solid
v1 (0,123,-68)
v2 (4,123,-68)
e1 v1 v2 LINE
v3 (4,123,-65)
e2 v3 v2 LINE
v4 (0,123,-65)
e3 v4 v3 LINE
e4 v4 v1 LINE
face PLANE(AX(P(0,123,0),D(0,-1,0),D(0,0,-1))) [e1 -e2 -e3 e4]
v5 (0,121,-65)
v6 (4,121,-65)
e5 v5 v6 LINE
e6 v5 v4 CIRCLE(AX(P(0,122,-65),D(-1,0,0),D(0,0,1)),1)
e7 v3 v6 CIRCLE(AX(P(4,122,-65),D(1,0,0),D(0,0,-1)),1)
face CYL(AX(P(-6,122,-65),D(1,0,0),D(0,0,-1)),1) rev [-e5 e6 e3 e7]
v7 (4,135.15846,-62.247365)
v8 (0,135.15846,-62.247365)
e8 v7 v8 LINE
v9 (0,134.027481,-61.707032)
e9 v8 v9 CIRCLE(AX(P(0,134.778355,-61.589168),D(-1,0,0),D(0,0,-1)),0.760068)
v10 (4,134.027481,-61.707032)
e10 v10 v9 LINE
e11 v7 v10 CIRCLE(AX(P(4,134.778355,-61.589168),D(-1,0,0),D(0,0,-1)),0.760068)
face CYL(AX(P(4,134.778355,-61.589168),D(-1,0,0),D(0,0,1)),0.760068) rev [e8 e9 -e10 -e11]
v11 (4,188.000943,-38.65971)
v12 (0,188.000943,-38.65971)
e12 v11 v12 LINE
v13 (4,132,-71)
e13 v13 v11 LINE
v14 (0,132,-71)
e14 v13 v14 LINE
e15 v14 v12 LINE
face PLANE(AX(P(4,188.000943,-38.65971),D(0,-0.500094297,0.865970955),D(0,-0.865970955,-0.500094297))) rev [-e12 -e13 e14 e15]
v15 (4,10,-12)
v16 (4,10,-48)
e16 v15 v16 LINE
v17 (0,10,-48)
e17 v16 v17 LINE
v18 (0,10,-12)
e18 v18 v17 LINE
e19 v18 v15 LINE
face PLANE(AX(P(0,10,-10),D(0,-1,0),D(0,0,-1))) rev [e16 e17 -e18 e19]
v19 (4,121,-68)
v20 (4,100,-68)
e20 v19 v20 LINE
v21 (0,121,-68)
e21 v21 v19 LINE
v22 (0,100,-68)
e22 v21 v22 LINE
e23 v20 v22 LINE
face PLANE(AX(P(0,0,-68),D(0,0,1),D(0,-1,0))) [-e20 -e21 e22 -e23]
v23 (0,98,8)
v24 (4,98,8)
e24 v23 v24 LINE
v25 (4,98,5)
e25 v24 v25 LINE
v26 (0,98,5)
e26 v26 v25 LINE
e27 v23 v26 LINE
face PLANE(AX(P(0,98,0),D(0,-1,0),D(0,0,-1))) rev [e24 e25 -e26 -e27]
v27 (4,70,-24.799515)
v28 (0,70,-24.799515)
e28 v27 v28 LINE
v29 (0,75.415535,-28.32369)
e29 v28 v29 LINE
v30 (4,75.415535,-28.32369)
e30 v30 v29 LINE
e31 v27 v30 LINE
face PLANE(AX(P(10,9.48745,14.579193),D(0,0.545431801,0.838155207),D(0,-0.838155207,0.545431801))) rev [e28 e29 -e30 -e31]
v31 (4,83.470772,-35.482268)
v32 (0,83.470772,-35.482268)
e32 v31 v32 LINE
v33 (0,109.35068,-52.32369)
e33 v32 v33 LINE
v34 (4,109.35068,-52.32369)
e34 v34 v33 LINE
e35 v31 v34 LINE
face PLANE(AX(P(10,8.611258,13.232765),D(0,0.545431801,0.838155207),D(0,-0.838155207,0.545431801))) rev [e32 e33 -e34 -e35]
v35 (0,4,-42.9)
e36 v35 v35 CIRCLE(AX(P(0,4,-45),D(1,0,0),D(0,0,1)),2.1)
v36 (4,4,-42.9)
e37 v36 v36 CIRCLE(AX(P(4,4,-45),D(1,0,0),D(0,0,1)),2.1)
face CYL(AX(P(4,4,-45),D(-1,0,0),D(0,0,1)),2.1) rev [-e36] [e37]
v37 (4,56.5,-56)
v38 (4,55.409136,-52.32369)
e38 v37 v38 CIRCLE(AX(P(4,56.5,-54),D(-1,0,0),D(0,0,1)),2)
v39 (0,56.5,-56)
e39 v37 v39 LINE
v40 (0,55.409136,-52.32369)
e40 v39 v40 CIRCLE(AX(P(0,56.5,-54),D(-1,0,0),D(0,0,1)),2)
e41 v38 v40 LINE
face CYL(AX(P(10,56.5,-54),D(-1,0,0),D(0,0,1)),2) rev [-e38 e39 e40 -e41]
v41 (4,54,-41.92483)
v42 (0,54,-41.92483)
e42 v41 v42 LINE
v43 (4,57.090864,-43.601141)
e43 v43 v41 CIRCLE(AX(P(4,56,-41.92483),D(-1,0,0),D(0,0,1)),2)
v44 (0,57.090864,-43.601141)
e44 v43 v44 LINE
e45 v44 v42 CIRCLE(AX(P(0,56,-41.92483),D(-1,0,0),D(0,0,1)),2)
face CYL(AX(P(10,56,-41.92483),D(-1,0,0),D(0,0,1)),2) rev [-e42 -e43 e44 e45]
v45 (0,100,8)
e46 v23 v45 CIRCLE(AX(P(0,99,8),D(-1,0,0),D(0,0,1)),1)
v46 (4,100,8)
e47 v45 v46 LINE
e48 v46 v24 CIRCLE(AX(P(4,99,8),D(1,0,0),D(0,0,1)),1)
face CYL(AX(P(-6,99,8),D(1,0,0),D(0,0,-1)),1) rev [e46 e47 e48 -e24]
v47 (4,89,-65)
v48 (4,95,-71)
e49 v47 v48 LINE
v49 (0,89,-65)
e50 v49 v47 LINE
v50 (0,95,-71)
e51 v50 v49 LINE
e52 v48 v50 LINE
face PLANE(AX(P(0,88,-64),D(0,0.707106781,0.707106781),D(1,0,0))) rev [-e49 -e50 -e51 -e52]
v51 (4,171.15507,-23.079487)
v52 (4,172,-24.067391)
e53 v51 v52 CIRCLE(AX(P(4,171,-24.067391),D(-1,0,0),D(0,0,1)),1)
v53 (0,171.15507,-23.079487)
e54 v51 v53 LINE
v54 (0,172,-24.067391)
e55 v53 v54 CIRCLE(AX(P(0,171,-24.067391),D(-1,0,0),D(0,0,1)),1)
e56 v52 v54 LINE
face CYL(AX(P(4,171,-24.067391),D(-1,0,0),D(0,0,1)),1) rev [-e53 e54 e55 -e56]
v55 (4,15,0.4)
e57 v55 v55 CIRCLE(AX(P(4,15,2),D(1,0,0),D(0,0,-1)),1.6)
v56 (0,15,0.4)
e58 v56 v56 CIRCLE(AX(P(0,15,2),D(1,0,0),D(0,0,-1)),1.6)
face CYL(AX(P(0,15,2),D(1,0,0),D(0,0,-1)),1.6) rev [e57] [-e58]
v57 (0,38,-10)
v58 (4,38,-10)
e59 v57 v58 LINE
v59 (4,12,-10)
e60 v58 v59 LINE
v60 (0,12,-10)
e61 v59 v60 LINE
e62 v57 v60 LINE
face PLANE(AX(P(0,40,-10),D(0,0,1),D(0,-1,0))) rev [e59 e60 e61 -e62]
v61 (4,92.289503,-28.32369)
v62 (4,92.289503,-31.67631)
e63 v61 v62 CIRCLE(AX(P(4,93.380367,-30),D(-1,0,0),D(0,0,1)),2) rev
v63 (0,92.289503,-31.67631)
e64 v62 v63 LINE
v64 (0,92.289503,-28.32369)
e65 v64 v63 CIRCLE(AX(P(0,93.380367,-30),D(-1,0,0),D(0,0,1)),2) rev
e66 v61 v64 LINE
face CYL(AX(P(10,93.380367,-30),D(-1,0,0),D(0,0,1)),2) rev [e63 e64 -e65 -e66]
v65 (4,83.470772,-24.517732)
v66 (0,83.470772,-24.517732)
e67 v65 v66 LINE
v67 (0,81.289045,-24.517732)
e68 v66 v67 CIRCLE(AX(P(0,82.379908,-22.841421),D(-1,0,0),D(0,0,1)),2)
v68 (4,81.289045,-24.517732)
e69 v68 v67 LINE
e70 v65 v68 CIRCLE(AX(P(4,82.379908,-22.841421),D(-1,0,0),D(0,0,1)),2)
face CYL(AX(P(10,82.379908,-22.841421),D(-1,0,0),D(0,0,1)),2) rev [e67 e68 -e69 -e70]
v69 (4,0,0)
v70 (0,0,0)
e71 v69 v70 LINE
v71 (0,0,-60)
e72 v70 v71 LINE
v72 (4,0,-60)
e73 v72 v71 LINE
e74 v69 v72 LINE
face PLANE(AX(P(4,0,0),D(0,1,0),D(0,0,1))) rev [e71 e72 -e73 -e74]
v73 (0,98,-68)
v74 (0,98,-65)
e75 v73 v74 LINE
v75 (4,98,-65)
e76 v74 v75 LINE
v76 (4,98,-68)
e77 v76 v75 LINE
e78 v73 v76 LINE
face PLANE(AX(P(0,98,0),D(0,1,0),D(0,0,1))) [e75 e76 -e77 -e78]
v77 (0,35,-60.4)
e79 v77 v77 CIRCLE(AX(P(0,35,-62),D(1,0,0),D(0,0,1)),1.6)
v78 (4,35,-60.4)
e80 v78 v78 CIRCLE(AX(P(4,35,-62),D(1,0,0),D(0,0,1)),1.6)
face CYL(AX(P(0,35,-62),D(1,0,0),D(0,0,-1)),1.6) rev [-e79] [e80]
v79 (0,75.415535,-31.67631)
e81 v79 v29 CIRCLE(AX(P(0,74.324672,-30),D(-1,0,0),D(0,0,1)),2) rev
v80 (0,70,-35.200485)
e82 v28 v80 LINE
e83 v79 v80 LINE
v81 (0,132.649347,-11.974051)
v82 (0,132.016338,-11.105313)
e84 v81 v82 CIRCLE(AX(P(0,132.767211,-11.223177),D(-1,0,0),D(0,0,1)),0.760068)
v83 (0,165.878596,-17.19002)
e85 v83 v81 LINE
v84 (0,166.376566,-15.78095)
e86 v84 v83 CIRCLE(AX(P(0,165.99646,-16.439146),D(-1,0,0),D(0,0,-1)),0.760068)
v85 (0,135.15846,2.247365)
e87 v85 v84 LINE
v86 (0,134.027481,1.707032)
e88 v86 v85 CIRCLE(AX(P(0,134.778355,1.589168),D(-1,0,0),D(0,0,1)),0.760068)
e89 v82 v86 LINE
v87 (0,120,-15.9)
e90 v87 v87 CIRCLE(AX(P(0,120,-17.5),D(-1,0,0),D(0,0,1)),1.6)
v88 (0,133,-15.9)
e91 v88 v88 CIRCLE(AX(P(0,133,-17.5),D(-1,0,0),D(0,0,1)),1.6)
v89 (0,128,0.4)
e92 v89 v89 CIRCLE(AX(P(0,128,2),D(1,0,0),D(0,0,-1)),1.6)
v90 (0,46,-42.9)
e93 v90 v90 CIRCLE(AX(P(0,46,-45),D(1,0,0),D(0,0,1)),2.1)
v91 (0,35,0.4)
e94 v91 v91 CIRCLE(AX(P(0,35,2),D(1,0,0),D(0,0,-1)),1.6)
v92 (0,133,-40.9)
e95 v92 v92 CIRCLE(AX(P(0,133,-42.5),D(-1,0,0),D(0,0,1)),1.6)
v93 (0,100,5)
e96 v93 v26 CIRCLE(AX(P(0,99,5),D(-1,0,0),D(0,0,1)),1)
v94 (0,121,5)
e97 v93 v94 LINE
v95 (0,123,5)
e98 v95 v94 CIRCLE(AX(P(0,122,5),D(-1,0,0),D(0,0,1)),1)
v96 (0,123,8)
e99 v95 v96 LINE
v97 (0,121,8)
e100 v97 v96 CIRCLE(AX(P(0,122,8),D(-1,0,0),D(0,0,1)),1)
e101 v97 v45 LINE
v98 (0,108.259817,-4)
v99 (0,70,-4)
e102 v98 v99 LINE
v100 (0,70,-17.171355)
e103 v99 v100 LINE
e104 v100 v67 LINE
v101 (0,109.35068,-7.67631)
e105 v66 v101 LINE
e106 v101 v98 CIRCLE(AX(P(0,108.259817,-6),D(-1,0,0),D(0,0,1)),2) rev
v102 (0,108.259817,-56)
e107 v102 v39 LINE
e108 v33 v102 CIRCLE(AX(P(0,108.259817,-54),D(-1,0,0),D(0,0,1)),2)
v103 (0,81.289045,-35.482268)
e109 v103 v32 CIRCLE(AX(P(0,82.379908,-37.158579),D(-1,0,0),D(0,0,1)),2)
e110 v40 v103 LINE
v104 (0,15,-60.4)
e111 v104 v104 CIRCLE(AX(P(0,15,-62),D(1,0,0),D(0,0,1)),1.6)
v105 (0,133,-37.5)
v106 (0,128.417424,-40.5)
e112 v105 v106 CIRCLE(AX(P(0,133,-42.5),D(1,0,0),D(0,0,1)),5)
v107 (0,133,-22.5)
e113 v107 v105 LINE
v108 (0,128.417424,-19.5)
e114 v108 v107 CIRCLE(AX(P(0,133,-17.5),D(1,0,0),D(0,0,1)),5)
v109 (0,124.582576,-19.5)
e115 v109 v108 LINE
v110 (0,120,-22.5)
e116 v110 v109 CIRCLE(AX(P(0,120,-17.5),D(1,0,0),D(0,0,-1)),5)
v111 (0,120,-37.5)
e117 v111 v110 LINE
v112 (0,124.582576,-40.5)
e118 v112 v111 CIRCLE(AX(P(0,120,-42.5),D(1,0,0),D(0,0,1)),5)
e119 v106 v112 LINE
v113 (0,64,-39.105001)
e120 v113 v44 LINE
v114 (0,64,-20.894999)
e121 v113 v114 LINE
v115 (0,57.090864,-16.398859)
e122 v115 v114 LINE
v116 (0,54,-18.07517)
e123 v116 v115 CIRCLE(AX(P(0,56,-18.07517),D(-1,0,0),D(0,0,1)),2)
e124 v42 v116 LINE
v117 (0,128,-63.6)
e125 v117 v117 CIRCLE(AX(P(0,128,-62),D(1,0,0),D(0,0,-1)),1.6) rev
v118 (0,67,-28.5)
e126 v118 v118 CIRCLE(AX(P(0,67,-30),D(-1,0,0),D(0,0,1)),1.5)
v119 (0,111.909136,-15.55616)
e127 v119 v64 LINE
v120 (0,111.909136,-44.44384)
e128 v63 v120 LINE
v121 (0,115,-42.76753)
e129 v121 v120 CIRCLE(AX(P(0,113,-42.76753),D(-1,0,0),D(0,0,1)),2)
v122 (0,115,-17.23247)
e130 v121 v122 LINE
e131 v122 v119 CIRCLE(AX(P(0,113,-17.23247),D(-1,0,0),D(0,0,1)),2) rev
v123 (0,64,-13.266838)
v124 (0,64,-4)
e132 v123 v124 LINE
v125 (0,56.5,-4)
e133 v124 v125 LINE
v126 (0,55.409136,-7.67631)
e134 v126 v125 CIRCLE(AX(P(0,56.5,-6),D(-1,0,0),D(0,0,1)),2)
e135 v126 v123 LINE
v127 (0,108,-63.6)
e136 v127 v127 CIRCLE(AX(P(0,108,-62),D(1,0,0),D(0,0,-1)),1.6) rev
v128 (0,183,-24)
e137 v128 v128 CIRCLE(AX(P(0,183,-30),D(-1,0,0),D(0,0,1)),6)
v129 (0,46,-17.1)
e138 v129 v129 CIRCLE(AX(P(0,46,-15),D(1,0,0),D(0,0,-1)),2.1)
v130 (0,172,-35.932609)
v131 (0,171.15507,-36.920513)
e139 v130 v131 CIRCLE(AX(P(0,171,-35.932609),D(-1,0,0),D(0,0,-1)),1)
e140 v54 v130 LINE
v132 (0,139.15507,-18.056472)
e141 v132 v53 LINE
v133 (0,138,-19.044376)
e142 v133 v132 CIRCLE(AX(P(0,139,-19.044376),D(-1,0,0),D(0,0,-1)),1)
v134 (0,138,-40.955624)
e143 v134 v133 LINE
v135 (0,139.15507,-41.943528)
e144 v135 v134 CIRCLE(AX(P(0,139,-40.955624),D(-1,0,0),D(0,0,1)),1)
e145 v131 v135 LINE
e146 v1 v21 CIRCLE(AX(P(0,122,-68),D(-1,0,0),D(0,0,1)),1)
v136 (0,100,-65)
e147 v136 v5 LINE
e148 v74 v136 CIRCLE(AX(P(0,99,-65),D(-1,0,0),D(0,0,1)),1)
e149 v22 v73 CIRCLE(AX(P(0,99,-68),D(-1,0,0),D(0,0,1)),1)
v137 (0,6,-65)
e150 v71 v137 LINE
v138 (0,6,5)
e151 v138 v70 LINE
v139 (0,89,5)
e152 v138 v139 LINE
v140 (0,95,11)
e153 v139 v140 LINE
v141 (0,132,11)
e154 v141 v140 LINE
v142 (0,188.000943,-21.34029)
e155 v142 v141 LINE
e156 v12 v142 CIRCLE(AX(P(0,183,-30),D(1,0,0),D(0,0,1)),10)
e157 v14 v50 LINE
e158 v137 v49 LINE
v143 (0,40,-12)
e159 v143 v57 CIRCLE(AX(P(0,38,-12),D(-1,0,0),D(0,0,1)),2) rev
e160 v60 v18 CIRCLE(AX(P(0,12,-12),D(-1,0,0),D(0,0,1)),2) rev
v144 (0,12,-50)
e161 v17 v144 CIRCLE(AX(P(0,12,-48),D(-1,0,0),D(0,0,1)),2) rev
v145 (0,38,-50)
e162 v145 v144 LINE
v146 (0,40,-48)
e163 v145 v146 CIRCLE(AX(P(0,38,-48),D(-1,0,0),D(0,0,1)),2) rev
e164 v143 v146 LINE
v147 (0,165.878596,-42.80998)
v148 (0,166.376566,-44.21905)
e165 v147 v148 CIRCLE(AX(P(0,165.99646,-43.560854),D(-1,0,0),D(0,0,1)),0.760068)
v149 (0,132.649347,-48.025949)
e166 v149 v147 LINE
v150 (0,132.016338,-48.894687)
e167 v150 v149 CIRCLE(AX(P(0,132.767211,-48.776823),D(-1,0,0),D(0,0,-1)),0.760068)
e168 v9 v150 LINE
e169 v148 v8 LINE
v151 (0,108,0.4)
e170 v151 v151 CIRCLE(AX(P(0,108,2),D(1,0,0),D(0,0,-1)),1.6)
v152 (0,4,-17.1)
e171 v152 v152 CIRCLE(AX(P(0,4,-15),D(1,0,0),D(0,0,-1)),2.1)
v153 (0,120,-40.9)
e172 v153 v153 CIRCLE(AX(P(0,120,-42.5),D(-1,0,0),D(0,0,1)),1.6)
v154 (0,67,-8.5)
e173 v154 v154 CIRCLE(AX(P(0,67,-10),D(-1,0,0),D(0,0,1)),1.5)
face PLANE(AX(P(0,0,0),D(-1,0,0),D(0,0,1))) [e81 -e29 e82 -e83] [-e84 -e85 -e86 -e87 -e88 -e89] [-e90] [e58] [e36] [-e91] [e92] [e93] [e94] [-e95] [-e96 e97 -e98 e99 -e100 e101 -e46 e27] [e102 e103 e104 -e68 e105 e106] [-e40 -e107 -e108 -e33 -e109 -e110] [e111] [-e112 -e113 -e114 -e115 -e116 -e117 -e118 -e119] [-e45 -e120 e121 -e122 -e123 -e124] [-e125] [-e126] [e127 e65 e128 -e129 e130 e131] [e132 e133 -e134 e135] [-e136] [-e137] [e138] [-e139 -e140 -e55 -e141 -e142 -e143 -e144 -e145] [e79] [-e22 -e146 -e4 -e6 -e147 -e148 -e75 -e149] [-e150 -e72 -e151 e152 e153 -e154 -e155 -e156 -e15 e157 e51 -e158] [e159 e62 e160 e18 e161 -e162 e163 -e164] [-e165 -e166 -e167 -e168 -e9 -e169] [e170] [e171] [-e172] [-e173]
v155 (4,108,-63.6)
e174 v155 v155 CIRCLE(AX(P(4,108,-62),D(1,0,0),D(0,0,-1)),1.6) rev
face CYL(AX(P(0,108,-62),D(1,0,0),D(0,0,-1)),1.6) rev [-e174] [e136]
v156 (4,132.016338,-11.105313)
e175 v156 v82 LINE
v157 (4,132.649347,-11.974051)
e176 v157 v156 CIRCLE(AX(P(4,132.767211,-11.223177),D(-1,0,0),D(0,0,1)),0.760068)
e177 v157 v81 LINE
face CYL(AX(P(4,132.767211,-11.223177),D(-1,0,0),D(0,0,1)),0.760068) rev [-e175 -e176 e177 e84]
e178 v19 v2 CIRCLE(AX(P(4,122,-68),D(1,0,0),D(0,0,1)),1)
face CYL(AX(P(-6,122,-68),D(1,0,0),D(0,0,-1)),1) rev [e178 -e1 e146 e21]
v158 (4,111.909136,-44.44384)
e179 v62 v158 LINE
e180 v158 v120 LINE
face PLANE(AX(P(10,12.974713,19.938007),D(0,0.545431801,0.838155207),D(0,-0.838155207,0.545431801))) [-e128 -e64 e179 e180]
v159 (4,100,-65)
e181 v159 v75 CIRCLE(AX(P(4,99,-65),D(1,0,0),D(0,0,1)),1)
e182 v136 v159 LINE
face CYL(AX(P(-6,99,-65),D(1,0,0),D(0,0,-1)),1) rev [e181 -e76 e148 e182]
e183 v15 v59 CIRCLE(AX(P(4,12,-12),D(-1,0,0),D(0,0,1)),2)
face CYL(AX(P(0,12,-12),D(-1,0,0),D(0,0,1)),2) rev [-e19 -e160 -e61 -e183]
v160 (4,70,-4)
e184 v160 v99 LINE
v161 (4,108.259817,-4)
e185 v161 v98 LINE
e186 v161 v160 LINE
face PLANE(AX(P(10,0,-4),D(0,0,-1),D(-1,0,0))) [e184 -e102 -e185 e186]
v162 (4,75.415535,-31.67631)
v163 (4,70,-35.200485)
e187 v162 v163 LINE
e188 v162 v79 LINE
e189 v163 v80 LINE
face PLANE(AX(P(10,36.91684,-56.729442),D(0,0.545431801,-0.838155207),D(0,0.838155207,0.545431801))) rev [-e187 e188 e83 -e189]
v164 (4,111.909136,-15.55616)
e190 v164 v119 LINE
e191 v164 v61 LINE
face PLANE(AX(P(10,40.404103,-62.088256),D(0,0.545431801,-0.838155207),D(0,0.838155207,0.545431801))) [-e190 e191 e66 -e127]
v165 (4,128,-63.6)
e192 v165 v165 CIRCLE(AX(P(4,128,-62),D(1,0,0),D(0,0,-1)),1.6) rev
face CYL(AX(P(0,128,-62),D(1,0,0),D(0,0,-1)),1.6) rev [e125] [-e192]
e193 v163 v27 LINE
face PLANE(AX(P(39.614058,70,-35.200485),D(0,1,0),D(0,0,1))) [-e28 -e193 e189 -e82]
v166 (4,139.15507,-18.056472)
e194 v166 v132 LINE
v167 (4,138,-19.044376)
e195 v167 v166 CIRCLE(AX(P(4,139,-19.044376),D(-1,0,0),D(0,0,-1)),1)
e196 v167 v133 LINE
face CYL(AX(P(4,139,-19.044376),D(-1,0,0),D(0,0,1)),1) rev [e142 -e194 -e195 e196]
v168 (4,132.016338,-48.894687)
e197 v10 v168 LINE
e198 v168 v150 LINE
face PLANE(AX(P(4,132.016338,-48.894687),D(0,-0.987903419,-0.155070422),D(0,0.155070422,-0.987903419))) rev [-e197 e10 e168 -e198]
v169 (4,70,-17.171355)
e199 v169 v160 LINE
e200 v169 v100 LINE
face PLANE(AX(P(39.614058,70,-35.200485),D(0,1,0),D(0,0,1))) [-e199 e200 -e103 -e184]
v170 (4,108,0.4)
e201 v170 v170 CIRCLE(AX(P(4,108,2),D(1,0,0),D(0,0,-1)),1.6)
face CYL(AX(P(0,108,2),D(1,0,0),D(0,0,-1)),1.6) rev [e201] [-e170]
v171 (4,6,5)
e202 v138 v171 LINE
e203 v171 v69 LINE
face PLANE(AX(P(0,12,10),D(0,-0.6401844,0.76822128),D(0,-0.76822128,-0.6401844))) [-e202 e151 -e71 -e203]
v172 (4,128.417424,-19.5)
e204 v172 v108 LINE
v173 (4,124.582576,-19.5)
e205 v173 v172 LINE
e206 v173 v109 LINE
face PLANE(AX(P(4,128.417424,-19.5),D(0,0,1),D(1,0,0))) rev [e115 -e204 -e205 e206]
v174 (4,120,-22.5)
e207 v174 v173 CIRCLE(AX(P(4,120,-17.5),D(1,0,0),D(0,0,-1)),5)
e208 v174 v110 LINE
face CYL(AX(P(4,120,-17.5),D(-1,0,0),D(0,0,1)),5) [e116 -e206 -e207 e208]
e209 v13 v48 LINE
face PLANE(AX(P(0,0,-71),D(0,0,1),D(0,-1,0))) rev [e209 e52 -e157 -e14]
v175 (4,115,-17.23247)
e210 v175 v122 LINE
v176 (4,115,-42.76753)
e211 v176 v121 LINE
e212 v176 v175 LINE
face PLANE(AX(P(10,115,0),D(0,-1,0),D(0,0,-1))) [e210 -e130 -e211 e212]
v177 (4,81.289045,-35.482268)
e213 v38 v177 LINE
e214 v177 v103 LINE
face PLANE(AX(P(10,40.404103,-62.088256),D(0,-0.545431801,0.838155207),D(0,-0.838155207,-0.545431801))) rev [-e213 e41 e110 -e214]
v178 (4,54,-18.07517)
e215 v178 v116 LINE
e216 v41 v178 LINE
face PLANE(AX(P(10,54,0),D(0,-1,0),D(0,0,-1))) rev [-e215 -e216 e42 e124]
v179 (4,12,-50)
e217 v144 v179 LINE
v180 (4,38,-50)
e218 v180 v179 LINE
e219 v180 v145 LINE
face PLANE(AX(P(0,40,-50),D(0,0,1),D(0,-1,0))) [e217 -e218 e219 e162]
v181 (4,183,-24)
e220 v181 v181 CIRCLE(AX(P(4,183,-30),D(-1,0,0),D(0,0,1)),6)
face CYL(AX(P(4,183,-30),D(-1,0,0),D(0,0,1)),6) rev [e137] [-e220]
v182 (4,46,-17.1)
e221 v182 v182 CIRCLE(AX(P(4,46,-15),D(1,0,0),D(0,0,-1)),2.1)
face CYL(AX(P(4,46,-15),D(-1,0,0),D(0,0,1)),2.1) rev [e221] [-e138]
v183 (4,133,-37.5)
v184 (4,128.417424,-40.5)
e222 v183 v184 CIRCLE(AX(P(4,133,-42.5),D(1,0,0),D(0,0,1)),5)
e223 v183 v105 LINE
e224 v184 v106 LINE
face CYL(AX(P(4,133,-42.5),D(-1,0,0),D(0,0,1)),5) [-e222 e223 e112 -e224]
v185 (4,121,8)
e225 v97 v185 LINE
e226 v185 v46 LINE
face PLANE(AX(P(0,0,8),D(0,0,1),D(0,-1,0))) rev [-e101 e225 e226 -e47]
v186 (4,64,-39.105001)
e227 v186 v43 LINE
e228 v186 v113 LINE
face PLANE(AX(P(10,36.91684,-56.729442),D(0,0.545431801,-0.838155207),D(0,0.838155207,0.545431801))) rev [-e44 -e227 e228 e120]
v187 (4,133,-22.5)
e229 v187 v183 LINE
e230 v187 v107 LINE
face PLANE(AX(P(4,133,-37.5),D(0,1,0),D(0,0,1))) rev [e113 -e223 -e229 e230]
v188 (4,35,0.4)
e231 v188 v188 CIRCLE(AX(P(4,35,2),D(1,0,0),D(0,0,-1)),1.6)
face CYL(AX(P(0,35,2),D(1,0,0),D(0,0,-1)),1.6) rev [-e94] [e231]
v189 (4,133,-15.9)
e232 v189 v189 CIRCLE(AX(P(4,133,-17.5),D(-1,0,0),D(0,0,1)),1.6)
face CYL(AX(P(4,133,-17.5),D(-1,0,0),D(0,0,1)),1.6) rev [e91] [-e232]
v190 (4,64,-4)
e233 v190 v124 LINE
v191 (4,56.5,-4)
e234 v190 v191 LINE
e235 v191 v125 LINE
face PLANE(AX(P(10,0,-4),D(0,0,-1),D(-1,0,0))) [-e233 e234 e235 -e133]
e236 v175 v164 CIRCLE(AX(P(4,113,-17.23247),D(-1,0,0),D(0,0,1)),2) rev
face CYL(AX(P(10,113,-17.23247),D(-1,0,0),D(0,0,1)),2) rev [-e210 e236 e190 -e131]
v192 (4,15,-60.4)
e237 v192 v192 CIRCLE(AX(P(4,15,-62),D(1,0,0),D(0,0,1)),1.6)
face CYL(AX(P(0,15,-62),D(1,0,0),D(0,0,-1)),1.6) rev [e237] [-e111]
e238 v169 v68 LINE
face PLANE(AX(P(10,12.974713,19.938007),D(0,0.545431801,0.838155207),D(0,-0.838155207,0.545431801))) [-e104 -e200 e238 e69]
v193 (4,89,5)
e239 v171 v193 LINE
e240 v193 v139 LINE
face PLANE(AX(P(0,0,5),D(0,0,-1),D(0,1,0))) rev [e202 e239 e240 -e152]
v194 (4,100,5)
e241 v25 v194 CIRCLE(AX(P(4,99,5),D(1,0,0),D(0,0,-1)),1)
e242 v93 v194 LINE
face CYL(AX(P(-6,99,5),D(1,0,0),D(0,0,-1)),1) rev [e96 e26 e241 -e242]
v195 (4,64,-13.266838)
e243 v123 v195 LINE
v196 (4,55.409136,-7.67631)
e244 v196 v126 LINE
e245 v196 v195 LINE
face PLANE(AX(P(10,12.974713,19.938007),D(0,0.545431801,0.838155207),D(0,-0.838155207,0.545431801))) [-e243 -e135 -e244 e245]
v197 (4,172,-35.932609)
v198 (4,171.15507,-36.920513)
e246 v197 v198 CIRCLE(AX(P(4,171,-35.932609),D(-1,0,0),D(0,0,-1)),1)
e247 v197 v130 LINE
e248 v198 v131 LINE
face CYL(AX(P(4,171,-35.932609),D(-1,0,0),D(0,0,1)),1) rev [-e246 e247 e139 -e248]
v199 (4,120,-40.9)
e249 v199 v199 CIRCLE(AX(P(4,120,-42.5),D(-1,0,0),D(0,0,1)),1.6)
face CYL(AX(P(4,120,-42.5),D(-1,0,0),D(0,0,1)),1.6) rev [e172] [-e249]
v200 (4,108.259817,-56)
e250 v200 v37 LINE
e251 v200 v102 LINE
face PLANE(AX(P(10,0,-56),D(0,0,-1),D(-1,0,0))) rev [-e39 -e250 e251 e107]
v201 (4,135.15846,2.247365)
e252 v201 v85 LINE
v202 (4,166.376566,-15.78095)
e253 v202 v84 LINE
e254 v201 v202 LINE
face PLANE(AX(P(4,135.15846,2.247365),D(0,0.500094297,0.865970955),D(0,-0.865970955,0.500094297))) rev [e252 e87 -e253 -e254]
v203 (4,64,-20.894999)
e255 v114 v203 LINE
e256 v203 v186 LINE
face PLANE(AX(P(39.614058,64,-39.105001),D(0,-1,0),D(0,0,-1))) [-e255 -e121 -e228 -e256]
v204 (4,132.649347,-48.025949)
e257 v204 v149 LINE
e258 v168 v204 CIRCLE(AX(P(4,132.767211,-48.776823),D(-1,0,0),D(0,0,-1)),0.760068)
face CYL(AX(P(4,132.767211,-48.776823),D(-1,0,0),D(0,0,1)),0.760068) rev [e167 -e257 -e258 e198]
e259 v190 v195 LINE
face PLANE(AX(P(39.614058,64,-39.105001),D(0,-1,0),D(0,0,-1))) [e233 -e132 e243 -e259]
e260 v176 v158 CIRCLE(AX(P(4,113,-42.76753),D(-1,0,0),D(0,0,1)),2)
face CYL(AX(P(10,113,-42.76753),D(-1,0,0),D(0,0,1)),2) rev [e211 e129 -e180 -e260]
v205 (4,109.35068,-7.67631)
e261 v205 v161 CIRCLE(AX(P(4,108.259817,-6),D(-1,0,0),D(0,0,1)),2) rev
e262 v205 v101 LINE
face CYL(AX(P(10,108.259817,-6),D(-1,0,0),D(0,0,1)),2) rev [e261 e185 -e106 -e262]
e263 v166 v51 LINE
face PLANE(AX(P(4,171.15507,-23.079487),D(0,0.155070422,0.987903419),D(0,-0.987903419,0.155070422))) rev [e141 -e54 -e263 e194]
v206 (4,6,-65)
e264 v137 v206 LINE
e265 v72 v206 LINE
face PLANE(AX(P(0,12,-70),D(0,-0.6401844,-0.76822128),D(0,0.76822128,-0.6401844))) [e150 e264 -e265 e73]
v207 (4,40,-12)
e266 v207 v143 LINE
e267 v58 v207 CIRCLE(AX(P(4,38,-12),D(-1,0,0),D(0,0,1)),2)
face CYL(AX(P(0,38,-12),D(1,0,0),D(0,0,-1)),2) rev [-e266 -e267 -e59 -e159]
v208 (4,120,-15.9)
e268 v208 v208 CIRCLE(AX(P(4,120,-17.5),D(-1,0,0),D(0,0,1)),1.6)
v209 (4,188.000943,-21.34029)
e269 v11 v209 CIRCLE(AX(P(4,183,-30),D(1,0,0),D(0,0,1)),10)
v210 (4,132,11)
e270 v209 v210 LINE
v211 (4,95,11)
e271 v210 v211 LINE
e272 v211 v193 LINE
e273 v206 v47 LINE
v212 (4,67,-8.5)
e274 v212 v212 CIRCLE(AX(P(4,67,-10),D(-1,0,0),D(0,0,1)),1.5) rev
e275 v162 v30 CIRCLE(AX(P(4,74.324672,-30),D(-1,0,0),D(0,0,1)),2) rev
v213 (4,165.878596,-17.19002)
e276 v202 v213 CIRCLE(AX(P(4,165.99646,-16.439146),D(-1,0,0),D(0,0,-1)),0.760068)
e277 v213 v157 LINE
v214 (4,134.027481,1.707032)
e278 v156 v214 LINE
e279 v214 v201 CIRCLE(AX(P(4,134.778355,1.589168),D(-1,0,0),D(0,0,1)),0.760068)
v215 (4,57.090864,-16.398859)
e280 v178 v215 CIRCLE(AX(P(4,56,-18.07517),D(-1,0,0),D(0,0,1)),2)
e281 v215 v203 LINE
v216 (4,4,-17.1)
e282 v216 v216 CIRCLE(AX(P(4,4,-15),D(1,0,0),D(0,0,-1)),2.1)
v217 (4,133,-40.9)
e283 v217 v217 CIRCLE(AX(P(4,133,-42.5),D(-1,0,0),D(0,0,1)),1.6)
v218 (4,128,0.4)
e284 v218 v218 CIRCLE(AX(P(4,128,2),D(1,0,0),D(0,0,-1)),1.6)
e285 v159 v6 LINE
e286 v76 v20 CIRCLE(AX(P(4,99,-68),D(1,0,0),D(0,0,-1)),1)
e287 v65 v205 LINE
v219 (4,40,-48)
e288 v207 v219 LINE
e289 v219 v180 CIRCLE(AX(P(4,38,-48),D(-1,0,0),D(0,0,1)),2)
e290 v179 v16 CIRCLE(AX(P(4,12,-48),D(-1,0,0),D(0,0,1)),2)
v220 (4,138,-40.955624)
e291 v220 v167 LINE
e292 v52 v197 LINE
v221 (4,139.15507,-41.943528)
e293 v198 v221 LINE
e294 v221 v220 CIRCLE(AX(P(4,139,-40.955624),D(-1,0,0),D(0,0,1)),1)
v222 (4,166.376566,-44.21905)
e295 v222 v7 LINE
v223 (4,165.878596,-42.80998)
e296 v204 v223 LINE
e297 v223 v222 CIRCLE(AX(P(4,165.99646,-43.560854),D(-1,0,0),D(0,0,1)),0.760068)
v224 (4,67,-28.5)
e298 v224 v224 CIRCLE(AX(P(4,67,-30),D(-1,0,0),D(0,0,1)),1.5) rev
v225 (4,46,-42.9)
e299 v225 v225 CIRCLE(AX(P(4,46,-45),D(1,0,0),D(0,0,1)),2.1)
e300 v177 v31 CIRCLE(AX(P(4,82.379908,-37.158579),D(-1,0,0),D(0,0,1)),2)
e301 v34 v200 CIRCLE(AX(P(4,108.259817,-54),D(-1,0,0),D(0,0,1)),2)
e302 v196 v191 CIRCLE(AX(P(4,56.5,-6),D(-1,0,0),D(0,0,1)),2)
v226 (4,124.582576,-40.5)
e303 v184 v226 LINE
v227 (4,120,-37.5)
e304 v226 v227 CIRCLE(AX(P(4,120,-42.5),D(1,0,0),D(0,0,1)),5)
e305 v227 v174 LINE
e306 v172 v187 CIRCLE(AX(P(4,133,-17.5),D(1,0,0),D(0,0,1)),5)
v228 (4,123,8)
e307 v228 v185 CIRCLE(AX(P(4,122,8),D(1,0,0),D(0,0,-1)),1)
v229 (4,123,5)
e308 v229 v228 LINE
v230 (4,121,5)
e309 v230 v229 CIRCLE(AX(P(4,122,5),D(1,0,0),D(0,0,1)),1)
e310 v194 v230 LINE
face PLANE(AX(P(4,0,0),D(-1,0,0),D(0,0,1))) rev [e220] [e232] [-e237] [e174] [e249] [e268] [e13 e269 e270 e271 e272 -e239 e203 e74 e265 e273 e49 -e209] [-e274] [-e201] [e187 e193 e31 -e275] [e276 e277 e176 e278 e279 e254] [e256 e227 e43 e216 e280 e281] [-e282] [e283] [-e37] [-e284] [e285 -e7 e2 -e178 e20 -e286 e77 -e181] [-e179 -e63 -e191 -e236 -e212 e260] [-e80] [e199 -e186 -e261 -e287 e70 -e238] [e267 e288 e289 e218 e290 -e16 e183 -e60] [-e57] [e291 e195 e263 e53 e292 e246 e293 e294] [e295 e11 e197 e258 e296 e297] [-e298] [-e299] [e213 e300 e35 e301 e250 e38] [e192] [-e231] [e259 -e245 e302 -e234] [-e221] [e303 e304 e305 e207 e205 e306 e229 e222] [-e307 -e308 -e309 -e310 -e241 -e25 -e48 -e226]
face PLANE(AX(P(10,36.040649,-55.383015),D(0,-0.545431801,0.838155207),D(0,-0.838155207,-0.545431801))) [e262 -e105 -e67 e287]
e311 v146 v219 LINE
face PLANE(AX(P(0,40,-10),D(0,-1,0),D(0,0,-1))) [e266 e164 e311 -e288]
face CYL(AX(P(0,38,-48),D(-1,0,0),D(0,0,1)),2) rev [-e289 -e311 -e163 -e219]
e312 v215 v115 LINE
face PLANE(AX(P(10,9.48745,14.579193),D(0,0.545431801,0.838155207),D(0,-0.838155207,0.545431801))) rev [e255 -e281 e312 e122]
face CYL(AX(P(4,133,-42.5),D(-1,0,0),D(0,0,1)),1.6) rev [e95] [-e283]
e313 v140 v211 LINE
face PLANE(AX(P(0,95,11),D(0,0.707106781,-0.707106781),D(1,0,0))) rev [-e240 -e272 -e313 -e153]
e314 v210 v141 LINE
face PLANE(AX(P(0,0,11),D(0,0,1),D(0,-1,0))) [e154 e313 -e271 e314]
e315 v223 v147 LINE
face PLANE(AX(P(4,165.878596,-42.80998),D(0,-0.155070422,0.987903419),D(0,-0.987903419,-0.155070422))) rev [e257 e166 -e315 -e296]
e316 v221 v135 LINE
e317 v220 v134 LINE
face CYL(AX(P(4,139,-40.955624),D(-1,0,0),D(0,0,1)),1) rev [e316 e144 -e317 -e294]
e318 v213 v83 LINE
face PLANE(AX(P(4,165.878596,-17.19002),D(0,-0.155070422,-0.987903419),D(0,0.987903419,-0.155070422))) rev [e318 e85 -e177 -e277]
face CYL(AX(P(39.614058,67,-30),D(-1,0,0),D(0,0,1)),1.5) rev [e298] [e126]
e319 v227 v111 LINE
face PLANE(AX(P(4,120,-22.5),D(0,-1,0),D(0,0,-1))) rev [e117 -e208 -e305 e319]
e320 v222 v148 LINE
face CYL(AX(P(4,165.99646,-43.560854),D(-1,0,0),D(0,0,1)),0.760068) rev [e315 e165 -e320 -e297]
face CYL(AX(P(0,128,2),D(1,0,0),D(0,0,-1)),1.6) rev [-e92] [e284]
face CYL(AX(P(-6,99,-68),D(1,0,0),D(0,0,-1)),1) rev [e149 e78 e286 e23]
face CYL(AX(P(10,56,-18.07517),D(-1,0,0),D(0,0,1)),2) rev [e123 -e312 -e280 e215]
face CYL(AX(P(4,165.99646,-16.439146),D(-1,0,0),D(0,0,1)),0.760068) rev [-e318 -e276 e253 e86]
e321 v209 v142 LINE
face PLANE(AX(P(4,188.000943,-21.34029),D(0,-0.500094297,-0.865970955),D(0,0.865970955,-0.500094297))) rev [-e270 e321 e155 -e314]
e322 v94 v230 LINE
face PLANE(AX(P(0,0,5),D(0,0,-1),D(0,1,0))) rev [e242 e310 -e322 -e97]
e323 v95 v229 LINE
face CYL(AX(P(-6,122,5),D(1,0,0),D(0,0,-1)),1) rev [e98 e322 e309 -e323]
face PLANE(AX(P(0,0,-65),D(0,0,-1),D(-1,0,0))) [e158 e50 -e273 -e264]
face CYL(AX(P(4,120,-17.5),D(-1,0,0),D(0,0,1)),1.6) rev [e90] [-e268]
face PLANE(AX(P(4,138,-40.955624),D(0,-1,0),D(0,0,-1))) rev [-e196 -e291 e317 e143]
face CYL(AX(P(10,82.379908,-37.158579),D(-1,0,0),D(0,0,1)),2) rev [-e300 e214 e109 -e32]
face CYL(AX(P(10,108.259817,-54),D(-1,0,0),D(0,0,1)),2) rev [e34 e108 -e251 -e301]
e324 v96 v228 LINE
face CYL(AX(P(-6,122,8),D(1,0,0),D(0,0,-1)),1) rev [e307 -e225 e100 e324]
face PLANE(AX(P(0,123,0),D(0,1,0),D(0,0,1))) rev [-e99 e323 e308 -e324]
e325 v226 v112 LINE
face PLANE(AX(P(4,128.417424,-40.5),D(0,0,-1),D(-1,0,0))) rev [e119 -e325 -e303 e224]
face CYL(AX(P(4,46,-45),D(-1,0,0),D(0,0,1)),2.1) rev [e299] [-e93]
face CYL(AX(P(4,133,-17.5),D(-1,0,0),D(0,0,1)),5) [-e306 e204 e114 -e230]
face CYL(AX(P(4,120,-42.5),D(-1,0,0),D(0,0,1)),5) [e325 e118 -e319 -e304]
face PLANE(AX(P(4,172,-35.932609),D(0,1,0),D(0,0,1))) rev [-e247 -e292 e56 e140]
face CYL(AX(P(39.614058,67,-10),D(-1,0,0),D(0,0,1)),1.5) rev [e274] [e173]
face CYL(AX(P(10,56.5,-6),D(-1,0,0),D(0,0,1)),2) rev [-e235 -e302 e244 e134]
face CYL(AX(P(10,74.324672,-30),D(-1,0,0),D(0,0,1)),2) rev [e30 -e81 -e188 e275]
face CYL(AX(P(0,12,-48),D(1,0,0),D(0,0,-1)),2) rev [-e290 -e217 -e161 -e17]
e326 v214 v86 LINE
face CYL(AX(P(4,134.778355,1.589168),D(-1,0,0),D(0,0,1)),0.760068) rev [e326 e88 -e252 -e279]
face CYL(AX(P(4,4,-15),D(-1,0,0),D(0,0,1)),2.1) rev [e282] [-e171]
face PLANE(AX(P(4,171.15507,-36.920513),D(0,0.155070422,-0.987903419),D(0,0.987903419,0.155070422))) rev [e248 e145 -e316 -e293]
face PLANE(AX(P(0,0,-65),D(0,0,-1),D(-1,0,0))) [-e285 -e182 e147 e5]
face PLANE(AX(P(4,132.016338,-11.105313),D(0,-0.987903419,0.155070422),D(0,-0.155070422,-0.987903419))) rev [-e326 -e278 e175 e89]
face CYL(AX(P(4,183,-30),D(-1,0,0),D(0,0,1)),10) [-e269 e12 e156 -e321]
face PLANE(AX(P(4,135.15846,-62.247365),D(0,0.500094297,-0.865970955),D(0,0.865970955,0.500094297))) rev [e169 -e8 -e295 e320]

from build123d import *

# Parameters (mm, degrees)
SKETCH_1_W           = 60
SKETCH_1_H           = 50
SKETCH_1_R           = 2.1
EXTRUDE_1_DEPTH      = 4
EXTRUDE_2_DEPTH      = 4
SKETCH_4_W           = 40
SKETCH_4_H           = 30
CUT_EXTRUDE_2_DEPTH  = 4
EXTRUDE_4_DEPTH      = 4
SKETCH_10_W          = 6
SKETCH_10_H          = 10
SKETCH_10_W_2        = 3
EXTRUDE_5_DEPTH      = 4
CHAMFER_1_SIZE       = 7
CUT_EXTRUDE_7_DEPTH  = 10
SKETCH_15_R          = 17.5
SKETCH_15_R_2        = 6
SKETCH_15_W          = 82
SKETCH_15_H          = 10
EXTRUDE_7_DEPTH      = 4
SKETCH_16_R          = 1.6
CUT_EXTRUDE_9_DEPTH  = 4
EXTRUDE_8_DEPTH      = 4
CUT_EXTRUDE_12_DEPTH = 10
SKETCH_22_R          = 1.6
CUT_EXTRUDE_13_DEPTH = 213.737514322
CUT_EXTRUDE_14_DEPTH = 213.737514322
SKETCH_24_R          = 1.6
CUT_EXTRUDE_15_DEPTH = 206.684223994
FILLET_1_R           = 2
SKETCH_26_R          = 1.5
EXTRUDE_9_DEPTH      = 4


with BuildPart() as part:
    # 草图1 → 凸台-拉伸1 (new body)
    with BuildSketch(Plane(origin=(0, 0, 0), x_dir=(0, 0, -1), z_dir=(1, 0, 0))):
        with Locations((30, 25)):
            Rectangle(SKETCH_1_W, SKETCH_1_H)
        with Locations((15, 4)):
            Circle(SKETCH_1_R, mode=Mode.SUBTRACT)
        with Locations((15, 46)):
            Circle(SKETCH_1_R, mode=Mode.SUBTRACT)
        with Locations(Location((45, 4, 0), (0, 0, 180))):
            Circle(SKETCH_1_R, mode=Mode.SUBTRACT)
        with Locations(Location((45, 46, 0), (0, 0, 180))):
            Circle(SKETCH_1_R, mode=Mode.SUBTRACT)
    extrude(amount=EXTRUDE_1_DEPTH)

    # 草图3 → 凸台-拉伸2 (add)
    with BuildSketch(Plane(origin=(4, 0, 0), x_dir=(0, 0, -1), z_dir=(1, 0, 0))):
        Polygon((0, 50), (-10, 38), (-10, 12), (0, 0), align=None)
        Polygon((70, 12), (60, 0), (60, 50), (70, 38), align=None)
    extrude(amount=-EXTRUDE_2_DEPTH)

    # 草图4 → 切除-拉伸2 (cut)
    with BuildSketch(Plane(origin=(4, 0, 0), x_dir=(0, 0, -1), z_dir=(1, 0, 0))):
        with Locations((30, 25)):
            Rectangle(SKETCH_4_W, SKETCH_4_H)
    extrude(amount=-CUT_EXTRUDE_2_DEPTH, mode=Mode.SUBTRACT)

    # 草图9 → 凸台-拉伸4 (add)
    with BuildSketch(Plane(origin=(4, 0, 0), x_dir=(0, 0, -1), z_dir=(1, 0, 0))):
        Polygon((60, 50), (65, 50), (65, 133), (60, 133), (0, 133), (-5, 133), (-5, 50), (0, 50), align=None)
        Polygon((-5, 50), (-5, 44), (0, 50), align=None)
        Polygon((65, 44), (60, 50), (65, 50), align=None)
    extrude(amount=-EXTRUDE_4_DEPTH)

    # 草图10 → 凸台-拉伸5 (add)
    with BuildSketch(Plane(origin=(4, 0, 0), x_dir=(0, 0, -1), z_dir=(1, 0, 0))):
        with Locations((-8, 128)):
            Rectangle(SKETCH_10_W, SKETCH_10_H)
        Polygon((-8, 123), (-11, 123), (-11, 88), (-8, 88), (-8, 98), align=None)
        with Locations((-6.5, 93)):
            Rectangle(SKETCH_10_W_2, SKETCH_10_H)
        with Locations((66.5, 93)):
            Rectangle(SKETCH_10_W_2, SKETCH_10_H)
        Polygon((68, 98), (68, 88), (71, 88), (71, 123), (68, 123), align=None)
        Polygon((65, 123), (68, 123), (71, 123), (71, 133), (65, 133), align=None)
    extrude(amount=-EXTRUDE_5_DEPTH)

    # 倒角1
    # the kernel refuses this chamfer: 7 mm, written as the material it takes off along each edge
    with BuildSketch(Plane(origin=(22.001780916, 88, -71), x_dir=(0, 0.9996219169112968, -0.027495876610586126), z_dir=(-1, 0, 0))) as chamfer_1_piece_1_section:
        Polygon((CHAMFER_1_SIZE * 0.999621916911, -CHAMFER_1_SIZE * 0.0274958766106), (-CHAMFER_1_SIZE * 0.0274958766106, -CHAMFER_1_SIZE * 0.999621916911), (0, 0), align=None)
    chamfer_1_piece_1 = extrude(amount=40.003561832, mode=Mode.PRIVATE)
    chamfer_1_piece_1 = split(chamfer_1_piece_1, bisect_by=Plane(origin=(2, 90.377464073, -65), z_dir=(0, 0, -1)), keep=Keep.TOP, mode=Mode.PRIVATE)
    add(chamfer_1_piece_1, mode=Mode.SUBTRACT)
    with BuildSketch(Plane(origin=(22.001780916, 88, 11), x_dir=(0, -0.02749587661058612, -0.9996219169112968), z_dir=(-1, 0, 0))) as chamfer_1_piece_2_section:
        Polygon((CHAMFER_1_SIZE * 0.999621916911, -CHAMFER_1_SIZE * 0.0274958766106), (-CHAMFER_1_SIZE * 0.0274958766106, -CHAMFER_1_SIZE * 0.999621916911), (0, 0), align=None)
    chamfer_1_piece_2 = extrude(amount=40.003561832, mode=Mode.PRIVATE)
    chamfer_1_piece_2 = split(chamfer_1_piece_2, bisect_by=Plane(origin=(2, 90.377464073, 5), z_dir=(0, 0, 1)), keep=Keep.TOP, mode=Mode.PRIVATE)
    add(chamfer_1_piece_2, mode=Mode.SUBTRACT)

    # 草图11 → 切除-拉伸7 (cut)
    with BuildSketch(Plane.ZY):
        with BuildLine():
            Line((-56, 108.259816518), (-56, 56.5))
            ThreePointArc((-56, 56.5), (-54.568937243, 54.582629297), (-52.323689586, 55.409136399))
            Line((-52.323689586, 55.409136399), (-35.482268273, 81.289044658))
            ThreePointArc((-35.482268273, 81.289044658), (-35.158578687, 82.379908259), (-35.482268273, 83.470771861))
            Line((-35.482268273, 83.470771861), (-52.323689586, 109.35068012))
            ThreePointArc((-52.323689586, 109.35068012), (-54.568937243, 110.177187221), (-56, 108.259816518))
        make_face()
        with BuildLine():
            Line((-42.767530034, 115), (-17.232469966, 115))
            ThreePointArc((-17.232469966, 115), (-15.474384757, 113.953486444), (-15.556159552, 111.909136399))
            Line((-15.556159552, 111.909136399), (-28.323689586, 92.289503362))
            ThreePointArc((-28.323689586, 92.289503362), (-30, 91.380366964), (-31.676310414, 92.289503362))
            Line((-31.676310414, 92.289503362), (-44.443840448, 111.909136399))
            ThreePointArc((-44.443840448, 111.909136399), (-44.525615243, 113.953486444), (-42.767530034, 115))
        make_face()
        with BuildLine():
            Line((-31.676310414, 75.415535463), (-43.60114091, 57.090863601))
            ThreePointArc((-43.60114091, 57.090863601), (-43.682915705, 55.046513556), (-41.924830496, 54))
            Line((-41.924830496, 54), (-18.075169504, 54))
            ThreePointArc((-18.075169504, 54), (-16.317084295, 55.046513556), (-16.39885909, 57.090863601))
            Line((-16.39885909, 57.090863601), (-28.323689586, 75.415535463))
            ThreePointArc((-28.323689586, 75.415535463), (-30, 76.324671862), (-31.676310414, 75.415535463))
        make_face()
        with BuildLine():
            Line((-24.517731727, 83.470771861), (-7.676310414, 109.35068012))
            ThreePointArc((-7.676310414, 109.35068012), (-5.431062757, 110.177187221), (-4, 108.259816518))
            Line((-4, 108.259816518), (-4, 56.5))
            ThreePointArc((-4, 56.5), (-5.431062757, 54.582629297), (-7.676310414, 55.409136399))
            Line((-7.676310414, 55.409136399), (-24.517731727, 81.289044658))
            ThreePointArc((-24.517731727, 81.289044658), (-24.841421313, 82.379908259), (-24.517731727, 83.470771861))
        make_face()
    extrude(amount=-CUT_EXTRUDE_7_DEPTH, mode=Mode.SUBTRACT)

    # 草图15 → 凸台-拉伸7 (add)
    # profile 1 of 3: a face of its own
    with BuildSketch(Plane.ZY):
        with Locations((-30, 183)):
            Circle(SKETCH_15_R)
        with Locations((-30, 183)):
            Circle(SKETCH_15_R_2, mode=Mode.SUBTRACT)
    # profile 2 of 3: a face of its own
    with BuildSketch(Plane.ZY):
        with BuildLine():
            Line((-47.5, 183), (-47.5, 143))
            Line((-47.5, 143), (-12.5, 143))
            Line((-12.5, 143), (-12.5, 183))
            ThreePointArc((-12.5, 183), (-30, 165.5), (-47.5, 183))
        make_face()
    # profile 3 of 3: a face of its own
    with BuildSketch(Plane.ZY):
        with Locations((-30, 138)):
            Rectangle(SKETCH_15_W, SKETCH_15_H)
    extrude(amount=-EXTRUDE_7_DEPTH)

    # 草图16 → 切除-拉伸9 (cut)
    with BuildSketch(Plane(origin=(4, 0, 0), x_dir=(0, 0, -1), z_dir=(1, 0, 0))):
        with Locations((-2, 128)):
            Circle(SKETCH_16_R)
        with Locations((-2, 108)):
            Circle(SKETCH_16_R)
        with Locations((62, 108)):
            Circle(SKETCH_16_R)
        with Locations((62, 128)):
            Circle(SKETCH_16_R)
    extrude(amount=-CUT_EXTRUDE_9_DEPTH, mode=Mode.SUBTRACT)

    # 草图17 → 凸台-拉伸8 (add)
    with BuildSketch(Plane(origin=(4, 0, 0), x_dir=(0, 0, -1), z_dir=(1, 0, 0))):
        Polygon((-11, 143), (12.5, 183), (12.5, 143), align=None)
        Polygon((47.5, 183), (71, 143), (47.5, 143), align=None)
    extrude(amount=-EXTRUDE_8_DEPTH)

    # 草图21 → 切除-拉伸12 (cut)
    with BuildSketch(Plane(origin=(4, 0, 0), x_dir=(0, 0, -1), z_dir=(1, 0, 0))):
        with BuildLine():
            Line((68, 123), (68, 121))
            ThreePointArc((68, 121), (69, 122), (68, 123))
        make_face()
        with BuildLine():
            Line((68, 98), (68, 100))
            ThreePointArc((68, 100), (69, 99), (68, 98))
        make_face()
        with BuildLine():
            Line((65, 98), (65, 100))
            ThreePointArc((65, 100), (64, 99), (65, 98))
        make_face()
        with BuildLine():
            Line((65, 123), (65, 121))
            ThreePointArc((65, 121), (64, 122), (65, 123))
        make_face()
        with BuildLine():
            Line((-8, 123), (-8, 121))
            ThreePointArc((-8, 121), (-9, 122), (-8, 123))
        make_face()
        with BuildLine():
            Line((-8, 98), (-8, 100))
            ThreePointArc((-8, 100), (-9, 99), (-8, 98))
        make_face()
        with BuildLine():
            Line((-5, 98), (-5, 100))
            ThreePointArc((-5, 100), (-4, 99), (-5, 98))
        make_face()
        with BuildLine():
            Line((-5, 123), (-5, 121))
            ThreePointArc((-5, 121), (-4, 122), (-5, 123))
        make_face()
    extrude(amount=-CUT_EXTRUDE_12_DEPTH, mode=Mode.SUBTRACT)

    # 草图22 → 切除-拉伸13 (cut, through all)
    with BuildSketch(Plane.ZY):
        with Locations((-42.5, 133)):
            Circle(SKETCH_22_R)
        with Locations((-17.5, 133)):
            Circle(SKETCH_22_R)
        with Locations((-42.5, 120)):
            Circle(SKETCH_22_R)
        with Locations((-17.5, 120)):
            Circle(SKETCH_22_R)
    extrude(amount=-CUT_EXTRUDE_13_DEPTH, mode=Mode.SUBTRACT)

    # 草图23 → 切除-拉伸14 (cut, through all)
    with BuildSketch(Plane.ZY):
        with BuildLine():
            Line((-38.659709546, 188.000942969), (-71, 132))
            Line((-71, 132), (-71, 143))
            Line((-71, 143), (-47.5, 183))
            ThreePointArc((-47.5, 183), (-30, 200.5), (-12.5, 183))
            Line((-12.5, 183), (11, 143))
            Line((11, 143), (11, 132))
            Line((11, 132), (-21.340290454, 188.000942969))
            ThreePointArc((-21.340290454, 188.000942969), (-30, 193), (-38.659709546, 188.000942969))
        make_face()
        with BuildLine():
            Line((-40.5, 128.417424305), (-40.5, 124.582575695))
            ThreePointArc((-40.5, 124.582575695), (-38.316699867, 122.738612788), (-37.5, 120))
            Line((-37.5, 120), (-22.5, 120))
            ThreePointArc((-22.5, 120), (-21.683300133, 122.738612788), (-19.5, 124.582575695))
            Line((-19.5, 124.582575695), (-19.5, 128.417424305))
            ThreePointArc((-19.5, 128.417424305), (-21.683300133, 130.261387212), (-22.5, 133))
            Line((-22.5, 133), (-37.5, 133))
            ThreePointArc((-37.5, 133), (-38.316699867, 130.261387212), (-40.5, 128.417424305))
        make_face()
        with BuildLine():
            Line((-42.809980264, 165.878596296), (-48.025949362, 132.64934701))
            ThreePointArc((-48.025949362, 132.64934701), (-48.329217572, 132.152920832), (-48.894686896, 132.016337524))
            Line((-48.894686896, 132.016337524), (-61.707032096, 134.027481262))
            ThreePointArc((-61.707032096, 134.027481262), (-62.274985772, 134.450700931), (-62.247364652, 135.15846031))
            Line((-62.247364652, 135.15846031), (-44.219050354, 166.376565857))
            ThreePointArc((-44.219050354, 166.376565857), (-43.307593682, 166.713092919), (-42.809980264, 165.878596296))
        make_face()
        with BuildLine():
            Line((-36.920512772, 171.155070422), (-41.943527577, 139.155070422))
            ThreePointArc((-41.943527577, 139.155070422), (-41.715581533, 138.350027086), (-40.955624159, 138))
            Line((-40.955624159, 138), (-19.044375841, 138))
            ThreePointArc((-19.044375841, 138), (-18.284418467, 138.350027086), (-18.056472423, 139.155070422))
            Line((-18.056472423, 139.155070422), (-23.079487228, 171.155070422))
            ThreePointArc((-23.079487228, 171.155070422), (-23.417417732, 171.759957374), (-24.067390646, 172))
            Line((-24.067390646, 172), (-35.932609354, 172))
            ThreePointArc((-35.932609354, 172), (-36.582582268, 171.759957374), (-36.920512772, 171.155070422))
        make_face()
        with BuildLine():
            Line((-11.105313104, 132.016337524), (1.707032096, 134.027481262))
            ThreePointArc((1.707032096, 134.027481262), (2.274985772, 134.450700931), (2.247364652, 135.15846031))
            Line((2.247364652, 135.15846031), (-15.780949646, 166.376565857))
            ThreePointArc((-15.780949646, 166.376565857), (-16.692406318, 166.713092919), (-17.190019736, 165.878596296))
            Line((-17.190019736, 165.878596296), (-11.974050638, 132.64934701))
            ThreePointArc((-11.974050638, 132.64934701), (-11.670782428, 132.152920832), (-11.105313104, 132.016337524))
        make_face()
    extrude(amount=-CUT_EXTRUDE_14_DEPTH, mode=Mode.SUBTRACT)

    # 草图24 → 切除-拉伸15 (cut, through all)
    with BuildSketch(Plane(origin=(4, 0, 0), x_dir=(0, 0, -1), z_dir=(1, 0, 0))):
        with Locations((-2, 35)):
            Circle(SKETCH_24_R)
        with Locations((-2, 15)):
            Circle(SKETCH_24_R)
        with Locations(Location((62, 15, 0), (0, 0, 180))):
            Circle(SKETCH_24_R)
        with Locations(Location((62, 35, 0), (0, 0, 180))):
            Circle(SKETCH_24_R)
        Polygon((-5, 44), (-5, 6), (-10, 12), (-10, 38), align=None)
        Polygon((65, 44), (65, 6), (70, 12), (70, 38), align=None)
    extrude(amount=-CUT_EXTRUDE_15_DEPTH, mode=Mode.SUBTRACT)

    # 圆角1
    fillet_1_edges = [part.edges().sort_by_distance(p)[0] for p in [
        (2, 10, -50),
        (2, 10, -10),
        (2, 40, -10),
        (2, 40, -50),
    ]]
    fillet(fillet_1_edges, radius=FILLET_1_R)

    # 草图26 → 凸台-拉伸9 (add)
    with BuildSketch(Plane.ZY):
        Polygon((-35.200484976, 70), (-4, 70), (-4, 64), (-39.10500144, 64), align=None)
        with Locations((-30, 67)):
            Circle(SKETCH_26_R, mode=Mode.SUBTRACT)
        with Locations((-10, 67)):
            Circle(SKETCH_26_R, mode=Mode.SUBTRACT)
    extrude(amount=-EXTRUDE_9_DEPTH)


solid = part.part
